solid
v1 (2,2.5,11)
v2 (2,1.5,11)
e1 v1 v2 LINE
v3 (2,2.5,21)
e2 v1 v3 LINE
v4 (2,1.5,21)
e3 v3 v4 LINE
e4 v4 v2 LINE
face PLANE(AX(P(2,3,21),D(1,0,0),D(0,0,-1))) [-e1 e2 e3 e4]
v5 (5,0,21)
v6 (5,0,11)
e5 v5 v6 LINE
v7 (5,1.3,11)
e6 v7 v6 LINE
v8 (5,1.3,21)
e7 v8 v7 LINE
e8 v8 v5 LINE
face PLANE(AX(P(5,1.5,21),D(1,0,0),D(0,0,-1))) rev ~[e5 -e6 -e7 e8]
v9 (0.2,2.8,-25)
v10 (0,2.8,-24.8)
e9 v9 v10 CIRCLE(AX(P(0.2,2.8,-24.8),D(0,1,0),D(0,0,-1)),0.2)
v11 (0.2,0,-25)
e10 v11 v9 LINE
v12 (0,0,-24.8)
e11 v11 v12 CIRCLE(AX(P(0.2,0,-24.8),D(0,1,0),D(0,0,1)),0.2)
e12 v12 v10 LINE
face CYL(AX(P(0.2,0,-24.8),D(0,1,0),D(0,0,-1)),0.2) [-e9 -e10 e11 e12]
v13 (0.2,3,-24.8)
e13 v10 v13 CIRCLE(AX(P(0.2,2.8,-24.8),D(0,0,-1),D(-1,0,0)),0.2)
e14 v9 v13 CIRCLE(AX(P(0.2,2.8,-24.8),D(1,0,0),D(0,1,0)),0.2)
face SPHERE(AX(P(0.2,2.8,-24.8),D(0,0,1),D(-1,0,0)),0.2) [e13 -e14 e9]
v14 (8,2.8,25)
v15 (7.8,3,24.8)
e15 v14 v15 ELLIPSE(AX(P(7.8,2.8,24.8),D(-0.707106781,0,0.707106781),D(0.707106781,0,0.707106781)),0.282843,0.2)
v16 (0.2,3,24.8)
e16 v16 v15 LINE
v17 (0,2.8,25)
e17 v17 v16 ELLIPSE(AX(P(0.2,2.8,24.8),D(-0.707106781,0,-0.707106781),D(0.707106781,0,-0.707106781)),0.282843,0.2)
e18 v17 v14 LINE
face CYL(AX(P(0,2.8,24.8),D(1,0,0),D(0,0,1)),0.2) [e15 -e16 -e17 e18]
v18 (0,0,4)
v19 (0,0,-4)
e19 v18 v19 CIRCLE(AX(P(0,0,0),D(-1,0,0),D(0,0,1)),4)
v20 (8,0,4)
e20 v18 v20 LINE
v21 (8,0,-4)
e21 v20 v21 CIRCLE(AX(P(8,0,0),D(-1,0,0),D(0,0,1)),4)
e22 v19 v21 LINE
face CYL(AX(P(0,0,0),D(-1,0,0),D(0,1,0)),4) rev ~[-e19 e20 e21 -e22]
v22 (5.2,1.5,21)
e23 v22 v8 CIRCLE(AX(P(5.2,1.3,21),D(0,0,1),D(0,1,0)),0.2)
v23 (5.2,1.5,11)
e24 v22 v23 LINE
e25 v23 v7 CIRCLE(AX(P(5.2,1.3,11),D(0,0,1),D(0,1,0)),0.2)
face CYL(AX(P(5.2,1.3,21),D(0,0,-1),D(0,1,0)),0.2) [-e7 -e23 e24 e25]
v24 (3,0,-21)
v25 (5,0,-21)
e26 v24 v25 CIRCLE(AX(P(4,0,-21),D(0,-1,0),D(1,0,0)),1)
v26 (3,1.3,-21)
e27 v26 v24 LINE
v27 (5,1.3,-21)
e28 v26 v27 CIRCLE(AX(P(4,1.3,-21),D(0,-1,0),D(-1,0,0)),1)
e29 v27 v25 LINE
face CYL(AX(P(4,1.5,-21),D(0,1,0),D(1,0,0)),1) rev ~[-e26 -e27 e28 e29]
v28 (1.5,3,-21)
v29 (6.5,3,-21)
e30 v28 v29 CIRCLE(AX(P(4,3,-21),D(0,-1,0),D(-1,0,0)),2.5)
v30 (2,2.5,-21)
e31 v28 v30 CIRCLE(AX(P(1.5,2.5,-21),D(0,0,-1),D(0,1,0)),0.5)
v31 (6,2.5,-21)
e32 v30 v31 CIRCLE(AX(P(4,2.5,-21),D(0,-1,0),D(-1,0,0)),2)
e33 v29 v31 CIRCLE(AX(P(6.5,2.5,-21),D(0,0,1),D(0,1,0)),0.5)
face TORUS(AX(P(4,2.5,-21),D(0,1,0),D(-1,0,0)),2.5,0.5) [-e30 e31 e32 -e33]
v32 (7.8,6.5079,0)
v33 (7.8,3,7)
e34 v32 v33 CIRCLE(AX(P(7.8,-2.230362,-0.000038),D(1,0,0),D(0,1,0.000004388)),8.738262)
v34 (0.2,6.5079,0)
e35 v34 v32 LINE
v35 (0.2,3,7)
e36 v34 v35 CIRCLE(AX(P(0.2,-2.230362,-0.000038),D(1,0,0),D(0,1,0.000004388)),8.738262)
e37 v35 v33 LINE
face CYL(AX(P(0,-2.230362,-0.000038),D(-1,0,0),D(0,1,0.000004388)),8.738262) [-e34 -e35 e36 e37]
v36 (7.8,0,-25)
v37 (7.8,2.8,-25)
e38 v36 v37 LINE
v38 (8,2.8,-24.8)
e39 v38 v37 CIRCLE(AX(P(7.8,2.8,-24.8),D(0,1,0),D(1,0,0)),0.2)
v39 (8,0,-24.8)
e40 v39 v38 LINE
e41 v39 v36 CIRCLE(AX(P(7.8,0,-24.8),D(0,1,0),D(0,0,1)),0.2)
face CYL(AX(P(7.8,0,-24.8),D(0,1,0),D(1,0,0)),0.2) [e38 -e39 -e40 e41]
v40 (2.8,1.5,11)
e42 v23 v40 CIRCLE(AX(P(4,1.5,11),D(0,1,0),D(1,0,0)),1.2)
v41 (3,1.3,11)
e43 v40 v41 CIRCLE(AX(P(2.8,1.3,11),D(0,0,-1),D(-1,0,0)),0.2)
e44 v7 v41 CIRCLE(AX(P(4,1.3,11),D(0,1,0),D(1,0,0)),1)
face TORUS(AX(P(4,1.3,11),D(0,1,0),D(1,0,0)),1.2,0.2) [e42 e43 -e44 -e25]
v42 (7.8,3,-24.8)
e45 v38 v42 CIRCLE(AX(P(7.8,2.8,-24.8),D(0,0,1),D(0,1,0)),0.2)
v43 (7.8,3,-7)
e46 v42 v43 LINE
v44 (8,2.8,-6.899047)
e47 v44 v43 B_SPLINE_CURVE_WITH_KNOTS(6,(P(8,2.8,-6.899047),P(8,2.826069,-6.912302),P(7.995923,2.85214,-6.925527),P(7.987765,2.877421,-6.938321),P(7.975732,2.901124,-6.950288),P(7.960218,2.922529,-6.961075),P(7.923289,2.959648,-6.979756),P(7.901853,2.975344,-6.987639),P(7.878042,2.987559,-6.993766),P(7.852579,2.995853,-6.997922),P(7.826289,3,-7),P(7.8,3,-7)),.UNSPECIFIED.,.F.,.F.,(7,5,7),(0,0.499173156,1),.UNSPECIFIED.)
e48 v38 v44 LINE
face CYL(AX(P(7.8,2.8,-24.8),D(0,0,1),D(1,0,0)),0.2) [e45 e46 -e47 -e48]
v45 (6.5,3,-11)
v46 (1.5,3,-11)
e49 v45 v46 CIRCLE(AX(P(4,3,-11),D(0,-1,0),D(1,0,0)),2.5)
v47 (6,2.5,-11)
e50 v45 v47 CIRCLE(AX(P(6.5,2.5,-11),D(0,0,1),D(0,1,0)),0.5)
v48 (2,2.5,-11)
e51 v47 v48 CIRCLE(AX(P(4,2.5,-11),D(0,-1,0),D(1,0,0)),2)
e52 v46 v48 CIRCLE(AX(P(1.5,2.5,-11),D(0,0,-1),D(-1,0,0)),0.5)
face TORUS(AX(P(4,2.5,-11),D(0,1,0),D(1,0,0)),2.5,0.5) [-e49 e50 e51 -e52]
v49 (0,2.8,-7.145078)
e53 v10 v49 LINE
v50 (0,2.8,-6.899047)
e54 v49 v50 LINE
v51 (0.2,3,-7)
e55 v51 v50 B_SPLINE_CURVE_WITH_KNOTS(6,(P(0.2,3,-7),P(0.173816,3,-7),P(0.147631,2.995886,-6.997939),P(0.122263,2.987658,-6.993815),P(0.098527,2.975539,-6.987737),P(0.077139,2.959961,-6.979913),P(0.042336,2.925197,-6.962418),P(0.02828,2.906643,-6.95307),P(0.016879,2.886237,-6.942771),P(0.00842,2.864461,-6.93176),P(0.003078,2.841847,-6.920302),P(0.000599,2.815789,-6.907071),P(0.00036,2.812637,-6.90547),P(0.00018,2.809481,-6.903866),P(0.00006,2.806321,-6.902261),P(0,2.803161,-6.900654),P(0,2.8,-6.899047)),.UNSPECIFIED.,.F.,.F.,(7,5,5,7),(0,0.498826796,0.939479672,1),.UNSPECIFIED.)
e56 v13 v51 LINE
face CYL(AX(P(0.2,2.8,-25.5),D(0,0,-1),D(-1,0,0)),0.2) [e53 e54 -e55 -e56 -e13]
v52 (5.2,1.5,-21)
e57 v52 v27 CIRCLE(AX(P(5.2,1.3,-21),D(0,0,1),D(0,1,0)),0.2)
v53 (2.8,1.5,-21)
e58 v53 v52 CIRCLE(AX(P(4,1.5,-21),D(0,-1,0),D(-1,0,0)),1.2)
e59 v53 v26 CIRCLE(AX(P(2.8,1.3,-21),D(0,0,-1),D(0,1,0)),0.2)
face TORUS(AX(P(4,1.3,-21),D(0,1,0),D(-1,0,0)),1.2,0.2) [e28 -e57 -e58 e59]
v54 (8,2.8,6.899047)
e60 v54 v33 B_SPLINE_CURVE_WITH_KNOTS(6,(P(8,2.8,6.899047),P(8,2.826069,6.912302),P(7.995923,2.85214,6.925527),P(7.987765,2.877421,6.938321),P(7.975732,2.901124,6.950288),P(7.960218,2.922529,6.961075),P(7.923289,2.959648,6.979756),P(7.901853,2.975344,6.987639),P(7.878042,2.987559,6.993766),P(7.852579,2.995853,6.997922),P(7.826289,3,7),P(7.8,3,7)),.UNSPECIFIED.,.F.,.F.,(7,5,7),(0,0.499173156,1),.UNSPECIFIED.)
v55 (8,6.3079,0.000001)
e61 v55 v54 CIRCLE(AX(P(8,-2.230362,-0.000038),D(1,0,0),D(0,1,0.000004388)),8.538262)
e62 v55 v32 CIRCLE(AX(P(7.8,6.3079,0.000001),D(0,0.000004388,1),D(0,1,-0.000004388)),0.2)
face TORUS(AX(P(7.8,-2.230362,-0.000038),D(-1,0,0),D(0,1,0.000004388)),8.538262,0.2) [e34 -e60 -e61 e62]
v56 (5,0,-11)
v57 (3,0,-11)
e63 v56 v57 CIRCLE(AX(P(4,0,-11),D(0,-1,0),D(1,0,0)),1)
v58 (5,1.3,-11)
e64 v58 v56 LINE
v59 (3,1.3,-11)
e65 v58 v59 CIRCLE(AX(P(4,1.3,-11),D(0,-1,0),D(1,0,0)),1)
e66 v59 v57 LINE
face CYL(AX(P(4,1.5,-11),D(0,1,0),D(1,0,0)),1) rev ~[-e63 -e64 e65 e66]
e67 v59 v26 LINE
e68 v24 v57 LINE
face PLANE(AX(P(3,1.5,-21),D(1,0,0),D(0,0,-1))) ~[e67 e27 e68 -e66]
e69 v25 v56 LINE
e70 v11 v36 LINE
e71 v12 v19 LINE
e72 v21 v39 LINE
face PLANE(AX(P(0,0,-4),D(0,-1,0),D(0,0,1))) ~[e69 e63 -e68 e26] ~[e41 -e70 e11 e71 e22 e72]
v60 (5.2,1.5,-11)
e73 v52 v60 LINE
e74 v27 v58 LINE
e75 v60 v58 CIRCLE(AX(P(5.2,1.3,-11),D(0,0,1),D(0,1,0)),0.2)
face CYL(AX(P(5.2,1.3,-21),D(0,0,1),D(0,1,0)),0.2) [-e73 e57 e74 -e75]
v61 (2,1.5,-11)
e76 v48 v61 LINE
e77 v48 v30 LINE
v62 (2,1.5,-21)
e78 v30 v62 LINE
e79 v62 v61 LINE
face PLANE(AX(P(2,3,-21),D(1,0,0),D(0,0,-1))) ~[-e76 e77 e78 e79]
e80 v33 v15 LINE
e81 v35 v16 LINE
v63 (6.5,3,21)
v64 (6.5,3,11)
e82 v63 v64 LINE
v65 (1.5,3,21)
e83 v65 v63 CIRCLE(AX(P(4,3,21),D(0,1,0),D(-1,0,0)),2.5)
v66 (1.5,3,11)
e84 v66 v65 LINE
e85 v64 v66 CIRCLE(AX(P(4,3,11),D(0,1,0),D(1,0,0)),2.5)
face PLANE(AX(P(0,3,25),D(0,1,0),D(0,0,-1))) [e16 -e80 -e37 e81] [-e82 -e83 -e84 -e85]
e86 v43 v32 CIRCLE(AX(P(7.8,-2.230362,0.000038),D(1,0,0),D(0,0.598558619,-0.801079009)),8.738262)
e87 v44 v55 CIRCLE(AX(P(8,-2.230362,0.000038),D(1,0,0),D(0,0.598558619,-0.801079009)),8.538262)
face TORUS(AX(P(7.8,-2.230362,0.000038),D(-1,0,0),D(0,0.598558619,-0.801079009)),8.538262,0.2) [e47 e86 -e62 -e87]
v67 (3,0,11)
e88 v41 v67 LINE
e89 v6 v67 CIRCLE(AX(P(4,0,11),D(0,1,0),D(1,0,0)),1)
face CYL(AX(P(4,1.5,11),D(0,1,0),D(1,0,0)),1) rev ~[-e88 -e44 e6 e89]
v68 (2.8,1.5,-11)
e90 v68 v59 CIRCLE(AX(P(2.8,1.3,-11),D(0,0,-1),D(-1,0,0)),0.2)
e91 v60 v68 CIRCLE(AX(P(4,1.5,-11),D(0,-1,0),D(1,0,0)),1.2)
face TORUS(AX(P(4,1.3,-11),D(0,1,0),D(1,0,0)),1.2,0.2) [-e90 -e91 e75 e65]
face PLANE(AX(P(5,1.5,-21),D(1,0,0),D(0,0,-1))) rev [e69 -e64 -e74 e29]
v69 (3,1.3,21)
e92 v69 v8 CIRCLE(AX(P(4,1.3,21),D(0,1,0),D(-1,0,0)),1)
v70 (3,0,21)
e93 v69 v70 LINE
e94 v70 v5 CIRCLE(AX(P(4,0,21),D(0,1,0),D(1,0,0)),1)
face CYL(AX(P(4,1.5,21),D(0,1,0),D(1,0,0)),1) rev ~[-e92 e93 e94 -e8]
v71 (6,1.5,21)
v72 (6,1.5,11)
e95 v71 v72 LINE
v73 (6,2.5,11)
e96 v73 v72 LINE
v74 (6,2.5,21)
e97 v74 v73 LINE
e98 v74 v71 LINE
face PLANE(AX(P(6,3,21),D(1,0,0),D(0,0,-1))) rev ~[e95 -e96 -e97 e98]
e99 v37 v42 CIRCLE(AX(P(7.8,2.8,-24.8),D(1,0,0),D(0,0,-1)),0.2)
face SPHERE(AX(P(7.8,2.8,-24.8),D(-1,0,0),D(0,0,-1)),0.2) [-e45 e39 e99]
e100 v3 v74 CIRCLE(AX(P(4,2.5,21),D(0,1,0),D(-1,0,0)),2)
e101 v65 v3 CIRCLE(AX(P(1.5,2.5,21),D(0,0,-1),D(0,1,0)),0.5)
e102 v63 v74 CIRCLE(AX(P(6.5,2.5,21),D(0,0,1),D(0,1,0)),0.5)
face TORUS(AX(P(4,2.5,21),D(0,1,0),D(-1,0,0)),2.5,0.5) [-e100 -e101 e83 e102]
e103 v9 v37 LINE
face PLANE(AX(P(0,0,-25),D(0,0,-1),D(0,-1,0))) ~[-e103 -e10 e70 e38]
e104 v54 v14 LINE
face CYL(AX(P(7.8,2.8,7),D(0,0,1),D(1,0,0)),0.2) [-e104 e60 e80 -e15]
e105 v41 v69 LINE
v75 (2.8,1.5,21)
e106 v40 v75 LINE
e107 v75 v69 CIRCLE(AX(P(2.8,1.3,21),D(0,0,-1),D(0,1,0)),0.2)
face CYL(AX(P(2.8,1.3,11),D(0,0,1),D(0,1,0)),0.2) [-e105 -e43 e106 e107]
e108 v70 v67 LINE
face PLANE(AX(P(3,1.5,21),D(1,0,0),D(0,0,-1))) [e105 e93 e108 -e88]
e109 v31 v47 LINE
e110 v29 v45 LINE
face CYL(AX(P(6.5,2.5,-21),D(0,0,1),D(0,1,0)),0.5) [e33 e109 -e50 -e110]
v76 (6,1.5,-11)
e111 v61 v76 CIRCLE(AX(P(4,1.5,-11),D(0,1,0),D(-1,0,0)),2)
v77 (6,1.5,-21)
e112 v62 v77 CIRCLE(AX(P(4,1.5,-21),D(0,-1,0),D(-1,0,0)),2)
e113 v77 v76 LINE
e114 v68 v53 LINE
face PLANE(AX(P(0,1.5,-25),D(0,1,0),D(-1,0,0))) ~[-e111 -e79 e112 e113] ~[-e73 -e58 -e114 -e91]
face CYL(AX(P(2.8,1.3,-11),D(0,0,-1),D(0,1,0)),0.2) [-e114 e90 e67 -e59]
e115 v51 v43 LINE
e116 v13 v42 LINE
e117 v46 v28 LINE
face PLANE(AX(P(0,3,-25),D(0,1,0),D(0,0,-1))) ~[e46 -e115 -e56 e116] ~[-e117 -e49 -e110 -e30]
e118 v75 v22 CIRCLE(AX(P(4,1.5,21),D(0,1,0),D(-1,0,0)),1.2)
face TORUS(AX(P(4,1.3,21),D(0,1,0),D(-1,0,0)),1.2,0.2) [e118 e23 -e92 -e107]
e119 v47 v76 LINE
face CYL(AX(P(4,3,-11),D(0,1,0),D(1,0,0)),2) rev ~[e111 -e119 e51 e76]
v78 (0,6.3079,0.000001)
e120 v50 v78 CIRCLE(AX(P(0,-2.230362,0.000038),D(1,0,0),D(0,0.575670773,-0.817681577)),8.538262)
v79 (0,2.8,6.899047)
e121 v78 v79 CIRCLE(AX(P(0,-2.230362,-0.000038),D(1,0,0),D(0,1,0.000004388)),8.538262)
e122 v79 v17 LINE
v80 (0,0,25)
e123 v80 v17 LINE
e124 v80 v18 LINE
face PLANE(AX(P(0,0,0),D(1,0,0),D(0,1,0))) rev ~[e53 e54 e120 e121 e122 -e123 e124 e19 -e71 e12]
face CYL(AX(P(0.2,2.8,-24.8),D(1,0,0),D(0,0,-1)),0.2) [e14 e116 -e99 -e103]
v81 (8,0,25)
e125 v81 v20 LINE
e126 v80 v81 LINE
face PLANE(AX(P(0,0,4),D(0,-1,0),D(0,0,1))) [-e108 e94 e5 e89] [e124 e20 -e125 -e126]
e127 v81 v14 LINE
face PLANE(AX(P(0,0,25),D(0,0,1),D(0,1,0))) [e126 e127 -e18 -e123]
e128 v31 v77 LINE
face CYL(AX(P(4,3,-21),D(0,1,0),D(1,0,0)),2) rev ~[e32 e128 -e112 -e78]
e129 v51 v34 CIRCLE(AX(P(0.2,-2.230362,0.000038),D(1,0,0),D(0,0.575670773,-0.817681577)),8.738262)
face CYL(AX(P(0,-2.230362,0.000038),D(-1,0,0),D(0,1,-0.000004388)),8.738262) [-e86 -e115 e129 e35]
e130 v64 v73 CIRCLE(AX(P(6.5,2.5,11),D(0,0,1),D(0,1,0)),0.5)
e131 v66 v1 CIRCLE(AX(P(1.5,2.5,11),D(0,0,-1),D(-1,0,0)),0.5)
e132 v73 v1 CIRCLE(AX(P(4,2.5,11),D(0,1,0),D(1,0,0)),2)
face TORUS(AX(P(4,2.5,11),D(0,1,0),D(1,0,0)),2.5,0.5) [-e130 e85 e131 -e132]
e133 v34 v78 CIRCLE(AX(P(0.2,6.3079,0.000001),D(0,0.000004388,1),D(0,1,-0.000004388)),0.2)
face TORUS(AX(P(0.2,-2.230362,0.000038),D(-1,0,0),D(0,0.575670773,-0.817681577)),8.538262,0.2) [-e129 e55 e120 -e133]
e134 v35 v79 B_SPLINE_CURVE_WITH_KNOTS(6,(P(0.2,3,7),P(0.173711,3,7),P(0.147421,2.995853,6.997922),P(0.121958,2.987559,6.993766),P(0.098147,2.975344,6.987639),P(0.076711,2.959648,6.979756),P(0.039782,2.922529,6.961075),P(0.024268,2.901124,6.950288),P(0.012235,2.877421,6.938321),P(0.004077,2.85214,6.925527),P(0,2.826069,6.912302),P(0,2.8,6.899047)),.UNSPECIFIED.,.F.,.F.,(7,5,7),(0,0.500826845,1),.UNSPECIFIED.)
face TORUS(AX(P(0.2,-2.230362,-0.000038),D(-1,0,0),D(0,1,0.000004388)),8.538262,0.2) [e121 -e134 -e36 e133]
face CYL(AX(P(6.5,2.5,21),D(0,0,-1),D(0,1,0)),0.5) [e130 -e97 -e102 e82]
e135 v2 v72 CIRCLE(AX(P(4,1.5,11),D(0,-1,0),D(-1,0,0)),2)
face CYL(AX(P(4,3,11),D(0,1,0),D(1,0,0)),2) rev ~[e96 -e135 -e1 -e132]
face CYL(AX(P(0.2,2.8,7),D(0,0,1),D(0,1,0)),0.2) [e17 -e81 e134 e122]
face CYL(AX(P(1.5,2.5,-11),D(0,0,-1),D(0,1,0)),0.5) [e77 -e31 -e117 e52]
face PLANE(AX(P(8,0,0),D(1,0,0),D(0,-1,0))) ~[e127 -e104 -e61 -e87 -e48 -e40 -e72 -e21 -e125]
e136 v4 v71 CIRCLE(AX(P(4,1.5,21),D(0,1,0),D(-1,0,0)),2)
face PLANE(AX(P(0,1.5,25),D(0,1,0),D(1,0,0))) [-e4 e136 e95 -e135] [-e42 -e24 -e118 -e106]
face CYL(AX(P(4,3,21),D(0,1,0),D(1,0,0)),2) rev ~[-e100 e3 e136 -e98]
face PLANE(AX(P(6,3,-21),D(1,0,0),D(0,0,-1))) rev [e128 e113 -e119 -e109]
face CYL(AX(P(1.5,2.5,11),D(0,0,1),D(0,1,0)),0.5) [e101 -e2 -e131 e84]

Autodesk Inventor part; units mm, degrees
ref_plane "YZ Plane" through (0, 0, 0) normal (1, 0, 0) x (0, 1, 0)
ref_plane "XZ Plane" through (0, 0, 0) normal (0, 1, 0) x (-1, 0, 0)
ref_plane "XY Plane" through (0, 0, 0) normal (0, 0, 1) x (1, 0, 0)
sketch "Sketch1" plane through (0, 0, 0) normal (1, 0, 0) x (0, 1, 0)
  point P0 (0, 0)
sketch "Sketch2" plane through (0, 0, 0) normal (1, 0, 0) x (0, 1, 0)
  line L0 (0, 25) -> (3, 25)
  arc A0 (0, 4) -> (0, 4) centre (0, 0.0048) ccw
  line L1 (3, 25) -> (3, 7)
  line L2 (6.5079, 0) -> (4, 0)
  arc A1 (6.5079, 0) -> (3, 7) centre (-2.2302, 0) ccw
  arc A2 (4, 0) -> (0, 4) centre (0, 0) ccw
  line L3 (0, 4) -> (0, 25)
  point P0 (0, 0)
  dimension "d0" = 25
  dimension "d1" = 3
  dimension "d2" = 4
  dimension "d5" = 18
  dimension "d22" = 4
extrude "Extrusion1" add sketch "Sketch2" along normal blind 8 contours L0 L1 A1 L2 A2 L3
sketch "Sketch3" plane through (0, 3, 25) normal (0, 1, 0) x (1, 0, 0)
  line L0 (0, 0) -> (8, 0)
  line L1 (8, 0) -> (4, 0)
  line L2 (4, 0) -> (4, 21)
  line L3 (4, 21) -> (0, 21)
  line L4 (0, 21) -> (4, 21)
  line L5 (8, 21) -> (0, 21) projected
  line L6 (4, 0) -> (4, 2)
  line L7 (4, 2) -> (4, 4)
  circle A0 centre (4, 4) radius 2
  line L8 (0, 18) -> (8, 18) projected
  line L9 (4, 18) -> (4, 14)
  circle A1 centre (4, 14) radius 2
  line L10 (2, 4) -> (2, 14)
  line L11 (6, 4) -> (6, 14)
  point P0 (0, 25)
  dimension "d10" = 2
  dimension "d11" = 2
  dimension "d12" = 4
  dimension "d13" = 4
extrude "Extrusion2" cut sketch "Sketch3" against normal blind 1.5
sketch "Sketch4" plane through (0, 1.5, 25) normal (0, 1, 0) x (1, 0, 0)
  arc A0 (6, 14) -> (2, 14) centre (4, 14) ccw projected
  line L0 (2, 14) -> (4, 14)
  line L1 (4, 14) -> (6, 14)
  line L2 (6, 14) -> (6, 4)
  arc A1 (2, 4) -> (6, 4) centre (4, 4) ccw projected
  line L3 (6, 4) -> (2, 4)
  line L4 (2, 4) -> (2, 14)
  line L5 (2, 4) -> (2, 14) projected
  circle A2 centre (4, 4) radius 1
  line L6 (4, 4) -> (4, 14)
  line L7 (0, 0) -> (8, 0) projected
  circle A3 centre (4, 14) radius 1
  line L8 (3, 4) -> (3, 14)
  line L9 (5, 4) -> (5, 14)
  point P0 (0, 25)
  dimension "d16" = 2
  dimension "d17" = 2
extrude "Extrusion3" cut sketch "Sketch4" against normal blind 1.5 contours A3 L6 L1 | L1 L0 A3 | L9 A2 L6 A3 | L0 L6 A3 | A3 L6 A2 L8 | A2 L3 | L3 L6 A2 | A2 L6 L3
fillet "Fillet1" radius 0.5 4 edges at (6, 3, 16) (4, 3, 23) (2, 3, 16) (4, 3, 9)
fillet "Fillet2" radius 0.2 4 edges at (5, 1.5, 16) (4, 1.5, 22) (3, 1.5, 16) (4, 1.5, 10)
sketch "Sketch5" plane through (0, 0, 0) normal (0, 0, 1) x (1, 0, 0)
  point P0 (0, 0)
mirror "Mirror1" about plane through (0, 0, 0) normal (0, 0, 1)
fillet "Fillet3" radius 0.2 1 edges at (0, 3, -16)
fillet "Fillet4" radius 0.2 2 edges at (4, 3, -25) (0, 1.5, -25)
fillet "Fillet5" radius 0.2 7 edges at (8, 1.5, -25) (8, 3, -16) (8, 5.5819, 3.9149) (0, 5.5819, 3.9149) (8, 3, 16) (4, 3, 25) (0, 3, 16)
properties part number "holder"
